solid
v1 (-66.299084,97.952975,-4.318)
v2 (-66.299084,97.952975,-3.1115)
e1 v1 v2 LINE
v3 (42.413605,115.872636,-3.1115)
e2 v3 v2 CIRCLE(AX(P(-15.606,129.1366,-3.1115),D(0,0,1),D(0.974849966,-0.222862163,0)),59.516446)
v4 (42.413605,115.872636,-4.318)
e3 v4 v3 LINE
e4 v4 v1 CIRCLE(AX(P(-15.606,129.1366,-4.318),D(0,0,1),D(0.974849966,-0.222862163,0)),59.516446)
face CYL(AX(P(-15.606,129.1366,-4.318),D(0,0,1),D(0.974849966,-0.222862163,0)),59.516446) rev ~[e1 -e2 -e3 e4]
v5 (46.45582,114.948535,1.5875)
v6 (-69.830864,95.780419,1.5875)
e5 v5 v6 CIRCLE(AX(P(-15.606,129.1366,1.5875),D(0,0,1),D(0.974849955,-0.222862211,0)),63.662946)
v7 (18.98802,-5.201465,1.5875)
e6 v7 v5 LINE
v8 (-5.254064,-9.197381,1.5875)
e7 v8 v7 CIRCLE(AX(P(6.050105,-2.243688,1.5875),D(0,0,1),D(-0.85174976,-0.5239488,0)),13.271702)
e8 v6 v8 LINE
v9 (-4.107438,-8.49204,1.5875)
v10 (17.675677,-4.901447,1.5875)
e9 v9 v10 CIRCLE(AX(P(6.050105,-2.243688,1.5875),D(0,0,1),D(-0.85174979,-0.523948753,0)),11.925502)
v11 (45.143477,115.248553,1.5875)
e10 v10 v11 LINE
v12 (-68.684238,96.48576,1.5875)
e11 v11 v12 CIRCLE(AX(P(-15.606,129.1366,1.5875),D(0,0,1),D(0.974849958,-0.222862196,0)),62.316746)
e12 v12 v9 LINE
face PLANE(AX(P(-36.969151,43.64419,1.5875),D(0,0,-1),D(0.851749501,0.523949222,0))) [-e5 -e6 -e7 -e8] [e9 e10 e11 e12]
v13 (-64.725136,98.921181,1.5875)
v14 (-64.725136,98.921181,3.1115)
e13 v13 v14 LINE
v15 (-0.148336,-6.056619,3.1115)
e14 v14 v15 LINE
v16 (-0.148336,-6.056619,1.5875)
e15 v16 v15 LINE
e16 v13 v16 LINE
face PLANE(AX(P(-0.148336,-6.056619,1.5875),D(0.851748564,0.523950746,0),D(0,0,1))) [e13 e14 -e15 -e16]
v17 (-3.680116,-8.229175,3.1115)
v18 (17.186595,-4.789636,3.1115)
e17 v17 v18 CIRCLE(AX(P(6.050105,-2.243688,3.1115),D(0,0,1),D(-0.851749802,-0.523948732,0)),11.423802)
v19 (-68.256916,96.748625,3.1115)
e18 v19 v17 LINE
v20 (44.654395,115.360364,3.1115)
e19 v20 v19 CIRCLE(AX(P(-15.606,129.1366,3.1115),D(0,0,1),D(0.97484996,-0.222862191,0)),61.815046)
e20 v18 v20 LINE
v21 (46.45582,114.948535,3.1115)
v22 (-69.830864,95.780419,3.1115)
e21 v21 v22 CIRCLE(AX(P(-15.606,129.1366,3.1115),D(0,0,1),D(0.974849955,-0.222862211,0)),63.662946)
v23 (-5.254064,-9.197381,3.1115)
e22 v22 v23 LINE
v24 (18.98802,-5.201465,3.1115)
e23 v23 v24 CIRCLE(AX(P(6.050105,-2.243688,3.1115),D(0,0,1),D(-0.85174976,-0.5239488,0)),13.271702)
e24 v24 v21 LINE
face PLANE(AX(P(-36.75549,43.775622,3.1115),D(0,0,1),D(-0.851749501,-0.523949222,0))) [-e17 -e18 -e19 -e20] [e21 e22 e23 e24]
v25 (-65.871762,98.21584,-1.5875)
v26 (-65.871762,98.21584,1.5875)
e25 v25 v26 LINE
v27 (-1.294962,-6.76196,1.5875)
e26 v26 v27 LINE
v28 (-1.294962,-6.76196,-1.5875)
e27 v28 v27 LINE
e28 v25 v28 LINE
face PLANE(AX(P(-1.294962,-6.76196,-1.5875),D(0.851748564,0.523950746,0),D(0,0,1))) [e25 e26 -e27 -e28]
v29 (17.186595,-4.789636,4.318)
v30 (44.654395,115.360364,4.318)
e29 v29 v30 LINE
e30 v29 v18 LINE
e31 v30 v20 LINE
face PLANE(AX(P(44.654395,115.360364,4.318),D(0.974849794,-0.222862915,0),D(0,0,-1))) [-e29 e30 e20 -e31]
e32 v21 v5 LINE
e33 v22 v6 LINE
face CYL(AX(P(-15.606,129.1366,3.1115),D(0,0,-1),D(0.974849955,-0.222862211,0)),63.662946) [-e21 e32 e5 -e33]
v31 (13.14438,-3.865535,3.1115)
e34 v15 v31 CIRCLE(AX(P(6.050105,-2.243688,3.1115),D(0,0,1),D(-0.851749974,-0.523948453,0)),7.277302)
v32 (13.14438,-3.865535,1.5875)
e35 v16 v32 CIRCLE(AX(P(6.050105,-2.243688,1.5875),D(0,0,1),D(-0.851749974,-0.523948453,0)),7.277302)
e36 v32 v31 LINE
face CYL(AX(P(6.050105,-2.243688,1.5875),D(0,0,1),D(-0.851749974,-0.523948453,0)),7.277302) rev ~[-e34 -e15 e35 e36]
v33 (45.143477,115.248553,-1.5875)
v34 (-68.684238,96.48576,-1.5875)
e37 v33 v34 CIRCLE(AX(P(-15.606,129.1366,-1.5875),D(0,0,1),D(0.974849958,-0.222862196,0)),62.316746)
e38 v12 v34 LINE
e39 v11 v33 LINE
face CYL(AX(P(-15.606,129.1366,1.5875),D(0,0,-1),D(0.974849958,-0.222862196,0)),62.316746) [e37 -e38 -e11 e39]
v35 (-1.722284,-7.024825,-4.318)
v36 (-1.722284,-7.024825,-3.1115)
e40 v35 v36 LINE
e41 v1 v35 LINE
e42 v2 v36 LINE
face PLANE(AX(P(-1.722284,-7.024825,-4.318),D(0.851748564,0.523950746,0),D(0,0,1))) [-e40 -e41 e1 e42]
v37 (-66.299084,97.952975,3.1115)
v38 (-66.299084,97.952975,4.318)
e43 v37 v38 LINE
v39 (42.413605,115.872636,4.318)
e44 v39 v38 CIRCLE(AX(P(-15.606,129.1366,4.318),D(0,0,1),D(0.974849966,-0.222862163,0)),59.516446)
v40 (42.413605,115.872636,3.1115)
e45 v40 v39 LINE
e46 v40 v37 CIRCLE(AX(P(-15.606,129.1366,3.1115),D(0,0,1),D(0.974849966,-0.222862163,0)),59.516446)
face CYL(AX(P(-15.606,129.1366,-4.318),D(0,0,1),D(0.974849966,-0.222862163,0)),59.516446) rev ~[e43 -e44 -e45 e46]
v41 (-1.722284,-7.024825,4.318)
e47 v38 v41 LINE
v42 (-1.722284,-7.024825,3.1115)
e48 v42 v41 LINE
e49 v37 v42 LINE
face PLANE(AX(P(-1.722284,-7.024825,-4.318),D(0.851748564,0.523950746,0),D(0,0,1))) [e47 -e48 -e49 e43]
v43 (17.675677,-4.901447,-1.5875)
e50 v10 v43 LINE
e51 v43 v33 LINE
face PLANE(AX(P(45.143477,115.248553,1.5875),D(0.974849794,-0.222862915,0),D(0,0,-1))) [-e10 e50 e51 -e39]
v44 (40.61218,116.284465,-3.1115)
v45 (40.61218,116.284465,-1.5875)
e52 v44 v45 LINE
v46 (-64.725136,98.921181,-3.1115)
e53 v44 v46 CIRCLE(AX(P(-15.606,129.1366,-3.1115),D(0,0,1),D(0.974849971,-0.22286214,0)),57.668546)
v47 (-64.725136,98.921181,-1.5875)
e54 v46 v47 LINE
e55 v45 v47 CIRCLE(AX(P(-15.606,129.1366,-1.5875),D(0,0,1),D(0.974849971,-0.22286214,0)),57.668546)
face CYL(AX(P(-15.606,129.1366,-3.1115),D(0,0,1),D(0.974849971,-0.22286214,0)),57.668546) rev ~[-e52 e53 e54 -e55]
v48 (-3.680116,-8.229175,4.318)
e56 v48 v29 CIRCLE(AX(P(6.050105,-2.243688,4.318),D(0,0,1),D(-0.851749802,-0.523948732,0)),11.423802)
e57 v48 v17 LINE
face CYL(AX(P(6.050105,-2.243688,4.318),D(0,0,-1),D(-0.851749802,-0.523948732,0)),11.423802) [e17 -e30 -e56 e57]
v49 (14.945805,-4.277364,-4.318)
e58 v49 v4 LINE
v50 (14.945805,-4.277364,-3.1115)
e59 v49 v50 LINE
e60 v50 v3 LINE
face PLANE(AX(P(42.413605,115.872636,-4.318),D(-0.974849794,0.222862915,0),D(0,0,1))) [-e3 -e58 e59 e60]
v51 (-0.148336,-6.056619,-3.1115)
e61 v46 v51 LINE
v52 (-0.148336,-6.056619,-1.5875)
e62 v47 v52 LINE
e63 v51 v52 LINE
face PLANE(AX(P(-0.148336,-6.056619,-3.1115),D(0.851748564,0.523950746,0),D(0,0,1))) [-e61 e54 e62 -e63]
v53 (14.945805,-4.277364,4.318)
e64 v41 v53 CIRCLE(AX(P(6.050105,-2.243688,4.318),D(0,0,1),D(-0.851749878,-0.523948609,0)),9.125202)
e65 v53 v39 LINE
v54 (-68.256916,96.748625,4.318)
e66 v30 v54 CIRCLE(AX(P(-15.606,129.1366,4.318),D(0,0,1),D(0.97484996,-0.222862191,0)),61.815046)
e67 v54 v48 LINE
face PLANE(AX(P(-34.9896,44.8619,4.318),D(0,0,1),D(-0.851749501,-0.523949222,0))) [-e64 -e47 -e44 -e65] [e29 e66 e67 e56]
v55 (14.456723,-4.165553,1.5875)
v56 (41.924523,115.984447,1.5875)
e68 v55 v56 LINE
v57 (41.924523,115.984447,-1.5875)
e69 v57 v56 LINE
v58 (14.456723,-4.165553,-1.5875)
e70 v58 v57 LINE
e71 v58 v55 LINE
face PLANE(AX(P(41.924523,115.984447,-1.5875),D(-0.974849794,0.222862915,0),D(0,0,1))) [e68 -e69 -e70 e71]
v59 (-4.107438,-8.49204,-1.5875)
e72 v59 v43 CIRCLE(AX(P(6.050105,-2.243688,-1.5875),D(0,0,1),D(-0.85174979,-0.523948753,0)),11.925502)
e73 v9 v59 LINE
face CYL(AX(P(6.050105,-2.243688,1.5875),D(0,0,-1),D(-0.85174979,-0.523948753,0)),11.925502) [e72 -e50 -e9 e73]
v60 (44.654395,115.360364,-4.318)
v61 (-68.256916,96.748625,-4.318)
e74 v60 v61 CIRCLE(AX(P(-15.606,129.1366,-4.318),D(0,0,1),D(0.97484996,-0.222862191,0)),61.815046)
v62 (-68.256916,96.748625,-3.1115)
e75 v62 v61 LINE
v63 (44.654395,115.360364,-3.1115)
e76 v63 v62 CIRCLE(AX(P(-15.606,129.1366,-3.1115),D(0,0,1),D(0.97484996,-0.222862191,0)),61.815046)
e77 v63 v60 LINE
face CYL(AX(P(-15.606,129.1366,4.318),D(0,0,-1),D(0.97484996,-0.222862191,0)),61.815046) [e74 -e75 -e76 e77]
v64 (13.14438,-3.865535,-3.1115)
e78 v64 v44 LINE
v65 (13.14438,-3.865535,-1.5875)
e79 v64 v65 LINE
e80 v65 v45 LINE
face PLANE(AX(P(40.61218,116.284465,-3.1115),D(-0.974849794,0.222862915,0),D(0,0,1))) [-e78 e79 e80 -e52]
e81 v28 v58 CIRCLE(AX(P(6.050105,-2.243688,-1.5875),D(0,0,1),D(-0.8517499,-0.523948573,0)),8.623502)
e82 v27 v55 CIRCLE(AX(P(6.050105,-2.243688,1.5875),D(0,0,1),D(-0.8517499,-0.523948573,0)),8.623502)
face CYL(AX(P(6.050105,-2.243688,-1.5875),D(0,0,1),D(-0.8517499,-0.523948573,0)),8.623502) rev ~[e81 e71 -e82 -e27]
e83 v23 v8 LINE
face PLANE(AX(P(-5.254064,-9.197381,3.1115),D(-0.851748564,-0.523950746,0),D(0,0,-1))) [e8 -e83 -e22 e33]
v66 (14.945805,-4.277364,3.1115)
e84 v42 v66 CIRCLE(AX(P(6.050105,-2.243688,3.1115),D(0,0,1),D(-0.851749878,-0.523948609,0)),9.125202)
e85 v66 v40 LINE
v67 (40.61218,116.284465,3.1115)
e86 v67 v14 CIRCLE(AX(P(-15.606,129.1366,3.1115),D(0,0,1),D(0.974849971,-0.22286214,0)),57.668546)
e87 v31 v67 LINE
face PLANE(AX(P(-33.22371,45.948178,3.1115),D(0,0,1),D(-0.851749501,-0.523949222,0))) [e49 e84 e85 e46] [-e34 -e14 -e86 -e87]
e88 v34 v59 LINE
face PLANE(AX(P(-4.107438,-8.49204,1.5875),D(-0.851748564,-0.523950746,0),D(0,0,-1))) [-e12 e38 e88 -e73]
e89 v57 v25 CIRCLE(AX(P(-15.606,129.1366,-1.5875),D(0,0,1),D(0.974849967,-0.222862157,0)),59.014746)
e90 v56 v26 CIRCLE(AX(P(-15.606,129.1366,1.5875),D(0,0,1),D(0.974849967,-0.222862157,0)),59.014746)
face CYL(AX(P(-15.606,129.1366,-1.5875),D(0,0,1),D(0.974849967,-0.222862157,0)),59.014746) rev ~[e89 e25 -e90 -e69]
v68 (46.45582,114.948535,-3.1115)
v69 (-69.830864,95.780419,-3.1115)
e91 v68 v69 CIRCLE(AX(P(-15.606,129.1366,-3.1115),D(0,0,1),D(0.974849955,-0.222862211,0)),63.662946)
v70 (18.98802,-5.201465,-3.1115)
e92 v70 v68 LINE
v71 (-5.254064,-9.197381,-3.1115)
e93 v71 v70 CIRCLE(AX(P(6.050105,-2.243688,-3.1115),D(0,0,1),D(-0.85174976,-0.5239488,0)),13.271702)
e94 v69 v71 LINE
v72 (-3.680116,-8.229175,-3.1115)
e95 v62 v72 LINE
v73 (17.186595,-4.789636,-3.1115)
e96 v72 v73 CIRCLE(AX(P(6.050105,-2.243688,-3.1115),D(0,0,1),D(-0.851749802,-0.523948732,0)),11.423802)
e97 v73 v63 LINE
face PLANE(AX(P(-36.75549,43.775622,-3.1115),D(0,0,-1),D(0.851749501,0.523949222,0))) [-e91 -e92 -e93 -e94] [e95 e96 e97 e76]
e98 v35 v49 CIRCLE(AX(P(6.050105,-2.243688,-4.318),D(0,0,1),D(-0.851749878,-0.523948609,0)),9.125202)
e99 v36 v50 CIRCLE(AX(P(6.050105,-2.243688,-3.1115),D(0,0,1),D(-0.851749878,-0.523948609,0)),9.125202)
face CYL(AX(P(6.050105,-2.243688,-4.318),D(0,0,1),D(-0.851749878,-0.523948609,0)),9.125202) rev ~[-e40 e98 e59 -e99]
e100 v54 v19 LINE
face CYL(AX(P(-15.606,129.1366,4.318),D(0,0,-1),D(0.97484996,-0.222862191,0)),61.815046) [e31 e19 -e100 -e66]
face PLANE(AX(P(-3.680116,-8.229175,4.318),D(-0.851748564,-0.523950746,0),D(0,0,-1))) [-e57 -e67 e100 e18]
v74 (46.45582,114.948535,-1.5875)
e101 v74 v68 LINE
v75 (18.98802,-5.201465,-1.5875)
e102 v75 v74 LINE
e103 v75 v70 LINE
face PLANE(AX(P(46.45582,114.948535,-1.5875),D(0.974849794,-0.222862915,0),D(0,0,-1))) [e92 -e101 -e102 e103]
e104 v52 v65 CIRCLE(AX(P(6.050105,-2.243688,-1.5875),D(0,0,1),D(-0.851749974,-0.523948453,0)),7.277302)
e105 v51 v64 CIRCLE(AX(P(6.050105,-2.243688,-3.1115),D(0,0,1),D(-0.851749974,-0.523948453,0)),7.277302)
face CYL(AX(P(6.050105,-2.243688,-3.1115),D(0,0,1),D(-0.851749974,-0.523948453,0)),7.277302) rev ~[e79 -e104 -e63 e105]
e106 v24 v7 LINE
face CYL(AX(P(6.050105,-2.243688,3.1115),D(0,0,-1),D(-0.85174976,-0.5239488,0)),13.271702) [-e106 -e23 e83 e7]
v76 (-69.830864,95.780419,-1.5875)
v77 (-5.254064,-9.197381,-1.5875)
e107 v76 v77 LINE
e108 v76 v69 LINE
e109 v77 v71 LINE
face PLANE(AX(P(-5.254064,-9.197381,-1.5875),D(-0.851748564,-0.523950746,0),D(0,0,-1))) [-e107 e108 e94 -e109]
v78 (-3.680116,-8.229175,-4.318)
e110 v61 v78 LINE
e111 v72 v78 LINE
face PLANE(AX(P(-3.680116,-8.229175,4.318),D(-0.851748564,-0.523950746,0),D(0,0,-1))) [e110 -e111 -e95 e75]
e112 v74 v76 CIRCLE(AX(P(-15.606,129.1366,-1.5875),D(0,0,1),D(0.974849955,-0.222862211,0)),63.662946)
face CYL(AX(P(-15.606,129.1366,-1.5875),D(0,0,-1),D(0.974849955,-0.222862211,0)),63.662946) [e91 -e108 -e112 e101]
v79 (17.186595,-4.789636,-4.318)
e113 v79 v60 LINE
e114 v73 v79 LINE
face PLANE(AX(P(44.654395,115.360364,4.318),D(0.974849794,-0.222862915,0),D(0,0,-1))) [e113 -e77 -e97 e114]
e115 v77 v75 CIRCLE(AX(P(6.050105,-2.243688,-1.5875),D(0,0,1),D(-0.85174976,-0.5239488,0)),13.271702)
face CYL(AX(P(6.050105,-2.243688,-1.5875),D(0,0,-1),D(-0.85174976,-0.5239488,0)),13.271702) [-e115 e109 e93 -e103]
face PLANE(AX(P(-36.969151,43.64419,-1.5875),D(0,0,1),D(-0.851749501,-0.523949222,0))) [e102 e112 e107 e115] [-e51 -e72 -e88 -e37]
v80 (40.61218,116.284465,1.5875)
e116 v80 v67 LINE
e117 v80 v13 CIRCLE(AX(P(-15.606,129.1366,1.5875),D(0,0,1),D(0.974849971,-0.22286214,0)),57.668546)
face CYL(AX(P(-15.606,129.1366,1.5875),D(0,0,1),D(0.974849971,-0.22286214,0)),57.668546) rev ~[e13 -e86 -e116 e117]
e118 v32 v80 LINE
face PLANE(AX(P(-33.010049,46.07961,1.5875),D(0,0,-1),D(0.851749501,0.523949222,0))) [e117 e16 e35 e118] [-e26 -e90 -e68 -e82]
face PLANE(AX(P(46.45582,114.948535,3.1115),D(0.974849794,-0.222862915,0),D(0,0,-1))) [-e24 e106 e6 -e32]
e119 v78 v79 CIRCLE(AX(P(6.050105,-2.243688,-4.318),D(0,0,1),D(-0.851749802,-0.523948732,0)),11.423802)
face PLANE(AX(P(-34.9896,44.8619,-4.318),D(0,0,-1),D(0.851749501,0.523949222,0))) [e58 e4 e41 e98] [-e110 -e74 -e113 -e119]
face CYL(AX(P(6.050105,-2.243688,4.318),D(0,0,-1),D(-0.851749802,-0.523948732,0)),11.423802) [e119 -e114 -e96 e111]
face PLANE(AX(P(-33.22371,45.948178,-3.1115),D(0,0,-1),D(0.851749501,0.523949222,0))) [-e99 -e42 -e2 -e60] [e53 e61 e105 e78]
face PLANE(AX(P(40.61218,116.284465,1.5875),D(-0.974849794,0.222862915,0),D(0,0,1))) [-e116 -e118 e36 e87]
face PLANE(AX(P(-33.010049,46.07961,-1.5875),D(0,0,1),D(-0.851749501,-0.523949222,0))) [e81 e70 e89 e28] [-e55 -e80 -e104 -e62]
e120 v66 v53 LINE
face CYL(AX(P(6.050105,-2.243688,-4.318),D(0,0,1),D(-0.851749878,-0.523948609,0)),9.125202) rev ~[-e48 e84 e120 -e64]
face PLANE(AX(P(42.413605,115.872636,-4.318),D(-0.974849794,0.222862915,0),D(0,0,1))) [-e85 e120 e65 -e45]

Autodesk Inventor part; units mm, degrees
ref_plane "Work Plane2" through (6.0501, -2.2437, 0) normal (-1, 0, 0) x (0, 0, 1)
ref_plane "Work Plane3" through (-15.606, 129.1366, 0) normal (0.4352118, -0.9003281, 0) x (0, 0, 1)
sketch "Path" plane through (0, 0, 0) normal (0, 0, 1) x (1, 0, 0)
  arc A0 (-2.7012, -7.627) -> (16.0662, -4.5335) centre (6.0501, -2.2437) ccw
  arc A1 (43.534, 115.6165) -> (-67.278, 97.3508) centre (-15.606, 129.1366) ccw
  line L0 (43.534, 115.6165) -> (16.0662, -4.5335)
  line L1 (-2.7012, -7.627) -> (-67.278, 97.3508)
  dimension "d31" = 5.9944
ref_plane "Section Plane" through (16.0662, -4.5335, 0) normal (0.2228629, 0.9748498, 0) x (0, 0, 1)
sketch "Section Sketch" plane through (16.0662, -4.5335, 0) normal (0.2228629, 0.9748498, 0) x (0, 0, 1)
  line L0 (-4.318, -1.1493) -> (4.318, -1.1493)
  line L1 (4.318, -1.1493) -> (4.318, 1.1493)
  line L2 (4.318, 1.1493) -> (-4.318, 1.1493)
  line L3 (-4.318, 1.1493) -> (-4.318, -1.1493)
  line L4 (-1.5875, -1.651) -> (1.5875, -1.651)
  line L5 (1.5875, -1.651) -> (1.5875, 1.651)
  line L6 (1.5875, 1.651) -> (-1.5875, 1.651)
  line L7 (-1.5875, 1.651) -> (-1.5875, -1.651)
  line L8 (-1.5875, 0) -> (1.5875, 0) construction
  line L9 (-3.1115, -2.9972) -> (-1.5875, -2.9972)
  line L10 (-1.5875, -2.9972) -> (-1.5875, 2.9972)
  line L11 (-1.5875, 2.9972) -> (-3.1115, 2.9972)
  line L12 (-3.1115, 2.9972) -> (-3.1115, -2.9972)
  line L13 (1.5875, -2.9972) -> (3.1115, -2.9972)
  line L14 (3.1115, -2.9972) -> (3.1115, 2.9972)
  line L15 (3.1115, 2.9972) -> (1.5875, 2.9972)
  line L16 (1.5875, 2.9972) -> (1.5875, -2.9972)
  line L17 (-4.318, 0) -> (4.318, 0) construction
  point P0 (0, 0)
  point P1 (0, 0)
  dimension "d21" = 2.2987
  dimension "d22" = 3.302
  dimension "d23" = 3.175
  dimension "d24" = 1.524
  dimension "d31" = 5.9944
  dimension "d32" = 8.636
sweep "Solid" add profiles "Section Sketch" path "Path"
pattern_of_one "Strand Pattern"
equation "\"d21\" = da_d2"
equation "\"d22\" = da_d1"
equation "\"d23\" = da_b1"
equation "\"d24\" = da_t1 + da_t2"
equation "\"d30\" = da_pt"
equation "\"da_p\" = 6.35"
equation "\"da_b1\" = 3.175"
equation "\"da_h2\" = 5.9944"
equation "\"da_h3\" = 5.207"
equation "\"da_d1\" = 3.302"
equation "\"da_d2\" = 2.2987"
equation "\"da_pt\" = 6.4008"
equation "\"da_b\" = 8.636"
equation "\"da_t1\" = 0.762"
equation "\"da_t2\" = 0.762"
properties part number "Roller Chain"
